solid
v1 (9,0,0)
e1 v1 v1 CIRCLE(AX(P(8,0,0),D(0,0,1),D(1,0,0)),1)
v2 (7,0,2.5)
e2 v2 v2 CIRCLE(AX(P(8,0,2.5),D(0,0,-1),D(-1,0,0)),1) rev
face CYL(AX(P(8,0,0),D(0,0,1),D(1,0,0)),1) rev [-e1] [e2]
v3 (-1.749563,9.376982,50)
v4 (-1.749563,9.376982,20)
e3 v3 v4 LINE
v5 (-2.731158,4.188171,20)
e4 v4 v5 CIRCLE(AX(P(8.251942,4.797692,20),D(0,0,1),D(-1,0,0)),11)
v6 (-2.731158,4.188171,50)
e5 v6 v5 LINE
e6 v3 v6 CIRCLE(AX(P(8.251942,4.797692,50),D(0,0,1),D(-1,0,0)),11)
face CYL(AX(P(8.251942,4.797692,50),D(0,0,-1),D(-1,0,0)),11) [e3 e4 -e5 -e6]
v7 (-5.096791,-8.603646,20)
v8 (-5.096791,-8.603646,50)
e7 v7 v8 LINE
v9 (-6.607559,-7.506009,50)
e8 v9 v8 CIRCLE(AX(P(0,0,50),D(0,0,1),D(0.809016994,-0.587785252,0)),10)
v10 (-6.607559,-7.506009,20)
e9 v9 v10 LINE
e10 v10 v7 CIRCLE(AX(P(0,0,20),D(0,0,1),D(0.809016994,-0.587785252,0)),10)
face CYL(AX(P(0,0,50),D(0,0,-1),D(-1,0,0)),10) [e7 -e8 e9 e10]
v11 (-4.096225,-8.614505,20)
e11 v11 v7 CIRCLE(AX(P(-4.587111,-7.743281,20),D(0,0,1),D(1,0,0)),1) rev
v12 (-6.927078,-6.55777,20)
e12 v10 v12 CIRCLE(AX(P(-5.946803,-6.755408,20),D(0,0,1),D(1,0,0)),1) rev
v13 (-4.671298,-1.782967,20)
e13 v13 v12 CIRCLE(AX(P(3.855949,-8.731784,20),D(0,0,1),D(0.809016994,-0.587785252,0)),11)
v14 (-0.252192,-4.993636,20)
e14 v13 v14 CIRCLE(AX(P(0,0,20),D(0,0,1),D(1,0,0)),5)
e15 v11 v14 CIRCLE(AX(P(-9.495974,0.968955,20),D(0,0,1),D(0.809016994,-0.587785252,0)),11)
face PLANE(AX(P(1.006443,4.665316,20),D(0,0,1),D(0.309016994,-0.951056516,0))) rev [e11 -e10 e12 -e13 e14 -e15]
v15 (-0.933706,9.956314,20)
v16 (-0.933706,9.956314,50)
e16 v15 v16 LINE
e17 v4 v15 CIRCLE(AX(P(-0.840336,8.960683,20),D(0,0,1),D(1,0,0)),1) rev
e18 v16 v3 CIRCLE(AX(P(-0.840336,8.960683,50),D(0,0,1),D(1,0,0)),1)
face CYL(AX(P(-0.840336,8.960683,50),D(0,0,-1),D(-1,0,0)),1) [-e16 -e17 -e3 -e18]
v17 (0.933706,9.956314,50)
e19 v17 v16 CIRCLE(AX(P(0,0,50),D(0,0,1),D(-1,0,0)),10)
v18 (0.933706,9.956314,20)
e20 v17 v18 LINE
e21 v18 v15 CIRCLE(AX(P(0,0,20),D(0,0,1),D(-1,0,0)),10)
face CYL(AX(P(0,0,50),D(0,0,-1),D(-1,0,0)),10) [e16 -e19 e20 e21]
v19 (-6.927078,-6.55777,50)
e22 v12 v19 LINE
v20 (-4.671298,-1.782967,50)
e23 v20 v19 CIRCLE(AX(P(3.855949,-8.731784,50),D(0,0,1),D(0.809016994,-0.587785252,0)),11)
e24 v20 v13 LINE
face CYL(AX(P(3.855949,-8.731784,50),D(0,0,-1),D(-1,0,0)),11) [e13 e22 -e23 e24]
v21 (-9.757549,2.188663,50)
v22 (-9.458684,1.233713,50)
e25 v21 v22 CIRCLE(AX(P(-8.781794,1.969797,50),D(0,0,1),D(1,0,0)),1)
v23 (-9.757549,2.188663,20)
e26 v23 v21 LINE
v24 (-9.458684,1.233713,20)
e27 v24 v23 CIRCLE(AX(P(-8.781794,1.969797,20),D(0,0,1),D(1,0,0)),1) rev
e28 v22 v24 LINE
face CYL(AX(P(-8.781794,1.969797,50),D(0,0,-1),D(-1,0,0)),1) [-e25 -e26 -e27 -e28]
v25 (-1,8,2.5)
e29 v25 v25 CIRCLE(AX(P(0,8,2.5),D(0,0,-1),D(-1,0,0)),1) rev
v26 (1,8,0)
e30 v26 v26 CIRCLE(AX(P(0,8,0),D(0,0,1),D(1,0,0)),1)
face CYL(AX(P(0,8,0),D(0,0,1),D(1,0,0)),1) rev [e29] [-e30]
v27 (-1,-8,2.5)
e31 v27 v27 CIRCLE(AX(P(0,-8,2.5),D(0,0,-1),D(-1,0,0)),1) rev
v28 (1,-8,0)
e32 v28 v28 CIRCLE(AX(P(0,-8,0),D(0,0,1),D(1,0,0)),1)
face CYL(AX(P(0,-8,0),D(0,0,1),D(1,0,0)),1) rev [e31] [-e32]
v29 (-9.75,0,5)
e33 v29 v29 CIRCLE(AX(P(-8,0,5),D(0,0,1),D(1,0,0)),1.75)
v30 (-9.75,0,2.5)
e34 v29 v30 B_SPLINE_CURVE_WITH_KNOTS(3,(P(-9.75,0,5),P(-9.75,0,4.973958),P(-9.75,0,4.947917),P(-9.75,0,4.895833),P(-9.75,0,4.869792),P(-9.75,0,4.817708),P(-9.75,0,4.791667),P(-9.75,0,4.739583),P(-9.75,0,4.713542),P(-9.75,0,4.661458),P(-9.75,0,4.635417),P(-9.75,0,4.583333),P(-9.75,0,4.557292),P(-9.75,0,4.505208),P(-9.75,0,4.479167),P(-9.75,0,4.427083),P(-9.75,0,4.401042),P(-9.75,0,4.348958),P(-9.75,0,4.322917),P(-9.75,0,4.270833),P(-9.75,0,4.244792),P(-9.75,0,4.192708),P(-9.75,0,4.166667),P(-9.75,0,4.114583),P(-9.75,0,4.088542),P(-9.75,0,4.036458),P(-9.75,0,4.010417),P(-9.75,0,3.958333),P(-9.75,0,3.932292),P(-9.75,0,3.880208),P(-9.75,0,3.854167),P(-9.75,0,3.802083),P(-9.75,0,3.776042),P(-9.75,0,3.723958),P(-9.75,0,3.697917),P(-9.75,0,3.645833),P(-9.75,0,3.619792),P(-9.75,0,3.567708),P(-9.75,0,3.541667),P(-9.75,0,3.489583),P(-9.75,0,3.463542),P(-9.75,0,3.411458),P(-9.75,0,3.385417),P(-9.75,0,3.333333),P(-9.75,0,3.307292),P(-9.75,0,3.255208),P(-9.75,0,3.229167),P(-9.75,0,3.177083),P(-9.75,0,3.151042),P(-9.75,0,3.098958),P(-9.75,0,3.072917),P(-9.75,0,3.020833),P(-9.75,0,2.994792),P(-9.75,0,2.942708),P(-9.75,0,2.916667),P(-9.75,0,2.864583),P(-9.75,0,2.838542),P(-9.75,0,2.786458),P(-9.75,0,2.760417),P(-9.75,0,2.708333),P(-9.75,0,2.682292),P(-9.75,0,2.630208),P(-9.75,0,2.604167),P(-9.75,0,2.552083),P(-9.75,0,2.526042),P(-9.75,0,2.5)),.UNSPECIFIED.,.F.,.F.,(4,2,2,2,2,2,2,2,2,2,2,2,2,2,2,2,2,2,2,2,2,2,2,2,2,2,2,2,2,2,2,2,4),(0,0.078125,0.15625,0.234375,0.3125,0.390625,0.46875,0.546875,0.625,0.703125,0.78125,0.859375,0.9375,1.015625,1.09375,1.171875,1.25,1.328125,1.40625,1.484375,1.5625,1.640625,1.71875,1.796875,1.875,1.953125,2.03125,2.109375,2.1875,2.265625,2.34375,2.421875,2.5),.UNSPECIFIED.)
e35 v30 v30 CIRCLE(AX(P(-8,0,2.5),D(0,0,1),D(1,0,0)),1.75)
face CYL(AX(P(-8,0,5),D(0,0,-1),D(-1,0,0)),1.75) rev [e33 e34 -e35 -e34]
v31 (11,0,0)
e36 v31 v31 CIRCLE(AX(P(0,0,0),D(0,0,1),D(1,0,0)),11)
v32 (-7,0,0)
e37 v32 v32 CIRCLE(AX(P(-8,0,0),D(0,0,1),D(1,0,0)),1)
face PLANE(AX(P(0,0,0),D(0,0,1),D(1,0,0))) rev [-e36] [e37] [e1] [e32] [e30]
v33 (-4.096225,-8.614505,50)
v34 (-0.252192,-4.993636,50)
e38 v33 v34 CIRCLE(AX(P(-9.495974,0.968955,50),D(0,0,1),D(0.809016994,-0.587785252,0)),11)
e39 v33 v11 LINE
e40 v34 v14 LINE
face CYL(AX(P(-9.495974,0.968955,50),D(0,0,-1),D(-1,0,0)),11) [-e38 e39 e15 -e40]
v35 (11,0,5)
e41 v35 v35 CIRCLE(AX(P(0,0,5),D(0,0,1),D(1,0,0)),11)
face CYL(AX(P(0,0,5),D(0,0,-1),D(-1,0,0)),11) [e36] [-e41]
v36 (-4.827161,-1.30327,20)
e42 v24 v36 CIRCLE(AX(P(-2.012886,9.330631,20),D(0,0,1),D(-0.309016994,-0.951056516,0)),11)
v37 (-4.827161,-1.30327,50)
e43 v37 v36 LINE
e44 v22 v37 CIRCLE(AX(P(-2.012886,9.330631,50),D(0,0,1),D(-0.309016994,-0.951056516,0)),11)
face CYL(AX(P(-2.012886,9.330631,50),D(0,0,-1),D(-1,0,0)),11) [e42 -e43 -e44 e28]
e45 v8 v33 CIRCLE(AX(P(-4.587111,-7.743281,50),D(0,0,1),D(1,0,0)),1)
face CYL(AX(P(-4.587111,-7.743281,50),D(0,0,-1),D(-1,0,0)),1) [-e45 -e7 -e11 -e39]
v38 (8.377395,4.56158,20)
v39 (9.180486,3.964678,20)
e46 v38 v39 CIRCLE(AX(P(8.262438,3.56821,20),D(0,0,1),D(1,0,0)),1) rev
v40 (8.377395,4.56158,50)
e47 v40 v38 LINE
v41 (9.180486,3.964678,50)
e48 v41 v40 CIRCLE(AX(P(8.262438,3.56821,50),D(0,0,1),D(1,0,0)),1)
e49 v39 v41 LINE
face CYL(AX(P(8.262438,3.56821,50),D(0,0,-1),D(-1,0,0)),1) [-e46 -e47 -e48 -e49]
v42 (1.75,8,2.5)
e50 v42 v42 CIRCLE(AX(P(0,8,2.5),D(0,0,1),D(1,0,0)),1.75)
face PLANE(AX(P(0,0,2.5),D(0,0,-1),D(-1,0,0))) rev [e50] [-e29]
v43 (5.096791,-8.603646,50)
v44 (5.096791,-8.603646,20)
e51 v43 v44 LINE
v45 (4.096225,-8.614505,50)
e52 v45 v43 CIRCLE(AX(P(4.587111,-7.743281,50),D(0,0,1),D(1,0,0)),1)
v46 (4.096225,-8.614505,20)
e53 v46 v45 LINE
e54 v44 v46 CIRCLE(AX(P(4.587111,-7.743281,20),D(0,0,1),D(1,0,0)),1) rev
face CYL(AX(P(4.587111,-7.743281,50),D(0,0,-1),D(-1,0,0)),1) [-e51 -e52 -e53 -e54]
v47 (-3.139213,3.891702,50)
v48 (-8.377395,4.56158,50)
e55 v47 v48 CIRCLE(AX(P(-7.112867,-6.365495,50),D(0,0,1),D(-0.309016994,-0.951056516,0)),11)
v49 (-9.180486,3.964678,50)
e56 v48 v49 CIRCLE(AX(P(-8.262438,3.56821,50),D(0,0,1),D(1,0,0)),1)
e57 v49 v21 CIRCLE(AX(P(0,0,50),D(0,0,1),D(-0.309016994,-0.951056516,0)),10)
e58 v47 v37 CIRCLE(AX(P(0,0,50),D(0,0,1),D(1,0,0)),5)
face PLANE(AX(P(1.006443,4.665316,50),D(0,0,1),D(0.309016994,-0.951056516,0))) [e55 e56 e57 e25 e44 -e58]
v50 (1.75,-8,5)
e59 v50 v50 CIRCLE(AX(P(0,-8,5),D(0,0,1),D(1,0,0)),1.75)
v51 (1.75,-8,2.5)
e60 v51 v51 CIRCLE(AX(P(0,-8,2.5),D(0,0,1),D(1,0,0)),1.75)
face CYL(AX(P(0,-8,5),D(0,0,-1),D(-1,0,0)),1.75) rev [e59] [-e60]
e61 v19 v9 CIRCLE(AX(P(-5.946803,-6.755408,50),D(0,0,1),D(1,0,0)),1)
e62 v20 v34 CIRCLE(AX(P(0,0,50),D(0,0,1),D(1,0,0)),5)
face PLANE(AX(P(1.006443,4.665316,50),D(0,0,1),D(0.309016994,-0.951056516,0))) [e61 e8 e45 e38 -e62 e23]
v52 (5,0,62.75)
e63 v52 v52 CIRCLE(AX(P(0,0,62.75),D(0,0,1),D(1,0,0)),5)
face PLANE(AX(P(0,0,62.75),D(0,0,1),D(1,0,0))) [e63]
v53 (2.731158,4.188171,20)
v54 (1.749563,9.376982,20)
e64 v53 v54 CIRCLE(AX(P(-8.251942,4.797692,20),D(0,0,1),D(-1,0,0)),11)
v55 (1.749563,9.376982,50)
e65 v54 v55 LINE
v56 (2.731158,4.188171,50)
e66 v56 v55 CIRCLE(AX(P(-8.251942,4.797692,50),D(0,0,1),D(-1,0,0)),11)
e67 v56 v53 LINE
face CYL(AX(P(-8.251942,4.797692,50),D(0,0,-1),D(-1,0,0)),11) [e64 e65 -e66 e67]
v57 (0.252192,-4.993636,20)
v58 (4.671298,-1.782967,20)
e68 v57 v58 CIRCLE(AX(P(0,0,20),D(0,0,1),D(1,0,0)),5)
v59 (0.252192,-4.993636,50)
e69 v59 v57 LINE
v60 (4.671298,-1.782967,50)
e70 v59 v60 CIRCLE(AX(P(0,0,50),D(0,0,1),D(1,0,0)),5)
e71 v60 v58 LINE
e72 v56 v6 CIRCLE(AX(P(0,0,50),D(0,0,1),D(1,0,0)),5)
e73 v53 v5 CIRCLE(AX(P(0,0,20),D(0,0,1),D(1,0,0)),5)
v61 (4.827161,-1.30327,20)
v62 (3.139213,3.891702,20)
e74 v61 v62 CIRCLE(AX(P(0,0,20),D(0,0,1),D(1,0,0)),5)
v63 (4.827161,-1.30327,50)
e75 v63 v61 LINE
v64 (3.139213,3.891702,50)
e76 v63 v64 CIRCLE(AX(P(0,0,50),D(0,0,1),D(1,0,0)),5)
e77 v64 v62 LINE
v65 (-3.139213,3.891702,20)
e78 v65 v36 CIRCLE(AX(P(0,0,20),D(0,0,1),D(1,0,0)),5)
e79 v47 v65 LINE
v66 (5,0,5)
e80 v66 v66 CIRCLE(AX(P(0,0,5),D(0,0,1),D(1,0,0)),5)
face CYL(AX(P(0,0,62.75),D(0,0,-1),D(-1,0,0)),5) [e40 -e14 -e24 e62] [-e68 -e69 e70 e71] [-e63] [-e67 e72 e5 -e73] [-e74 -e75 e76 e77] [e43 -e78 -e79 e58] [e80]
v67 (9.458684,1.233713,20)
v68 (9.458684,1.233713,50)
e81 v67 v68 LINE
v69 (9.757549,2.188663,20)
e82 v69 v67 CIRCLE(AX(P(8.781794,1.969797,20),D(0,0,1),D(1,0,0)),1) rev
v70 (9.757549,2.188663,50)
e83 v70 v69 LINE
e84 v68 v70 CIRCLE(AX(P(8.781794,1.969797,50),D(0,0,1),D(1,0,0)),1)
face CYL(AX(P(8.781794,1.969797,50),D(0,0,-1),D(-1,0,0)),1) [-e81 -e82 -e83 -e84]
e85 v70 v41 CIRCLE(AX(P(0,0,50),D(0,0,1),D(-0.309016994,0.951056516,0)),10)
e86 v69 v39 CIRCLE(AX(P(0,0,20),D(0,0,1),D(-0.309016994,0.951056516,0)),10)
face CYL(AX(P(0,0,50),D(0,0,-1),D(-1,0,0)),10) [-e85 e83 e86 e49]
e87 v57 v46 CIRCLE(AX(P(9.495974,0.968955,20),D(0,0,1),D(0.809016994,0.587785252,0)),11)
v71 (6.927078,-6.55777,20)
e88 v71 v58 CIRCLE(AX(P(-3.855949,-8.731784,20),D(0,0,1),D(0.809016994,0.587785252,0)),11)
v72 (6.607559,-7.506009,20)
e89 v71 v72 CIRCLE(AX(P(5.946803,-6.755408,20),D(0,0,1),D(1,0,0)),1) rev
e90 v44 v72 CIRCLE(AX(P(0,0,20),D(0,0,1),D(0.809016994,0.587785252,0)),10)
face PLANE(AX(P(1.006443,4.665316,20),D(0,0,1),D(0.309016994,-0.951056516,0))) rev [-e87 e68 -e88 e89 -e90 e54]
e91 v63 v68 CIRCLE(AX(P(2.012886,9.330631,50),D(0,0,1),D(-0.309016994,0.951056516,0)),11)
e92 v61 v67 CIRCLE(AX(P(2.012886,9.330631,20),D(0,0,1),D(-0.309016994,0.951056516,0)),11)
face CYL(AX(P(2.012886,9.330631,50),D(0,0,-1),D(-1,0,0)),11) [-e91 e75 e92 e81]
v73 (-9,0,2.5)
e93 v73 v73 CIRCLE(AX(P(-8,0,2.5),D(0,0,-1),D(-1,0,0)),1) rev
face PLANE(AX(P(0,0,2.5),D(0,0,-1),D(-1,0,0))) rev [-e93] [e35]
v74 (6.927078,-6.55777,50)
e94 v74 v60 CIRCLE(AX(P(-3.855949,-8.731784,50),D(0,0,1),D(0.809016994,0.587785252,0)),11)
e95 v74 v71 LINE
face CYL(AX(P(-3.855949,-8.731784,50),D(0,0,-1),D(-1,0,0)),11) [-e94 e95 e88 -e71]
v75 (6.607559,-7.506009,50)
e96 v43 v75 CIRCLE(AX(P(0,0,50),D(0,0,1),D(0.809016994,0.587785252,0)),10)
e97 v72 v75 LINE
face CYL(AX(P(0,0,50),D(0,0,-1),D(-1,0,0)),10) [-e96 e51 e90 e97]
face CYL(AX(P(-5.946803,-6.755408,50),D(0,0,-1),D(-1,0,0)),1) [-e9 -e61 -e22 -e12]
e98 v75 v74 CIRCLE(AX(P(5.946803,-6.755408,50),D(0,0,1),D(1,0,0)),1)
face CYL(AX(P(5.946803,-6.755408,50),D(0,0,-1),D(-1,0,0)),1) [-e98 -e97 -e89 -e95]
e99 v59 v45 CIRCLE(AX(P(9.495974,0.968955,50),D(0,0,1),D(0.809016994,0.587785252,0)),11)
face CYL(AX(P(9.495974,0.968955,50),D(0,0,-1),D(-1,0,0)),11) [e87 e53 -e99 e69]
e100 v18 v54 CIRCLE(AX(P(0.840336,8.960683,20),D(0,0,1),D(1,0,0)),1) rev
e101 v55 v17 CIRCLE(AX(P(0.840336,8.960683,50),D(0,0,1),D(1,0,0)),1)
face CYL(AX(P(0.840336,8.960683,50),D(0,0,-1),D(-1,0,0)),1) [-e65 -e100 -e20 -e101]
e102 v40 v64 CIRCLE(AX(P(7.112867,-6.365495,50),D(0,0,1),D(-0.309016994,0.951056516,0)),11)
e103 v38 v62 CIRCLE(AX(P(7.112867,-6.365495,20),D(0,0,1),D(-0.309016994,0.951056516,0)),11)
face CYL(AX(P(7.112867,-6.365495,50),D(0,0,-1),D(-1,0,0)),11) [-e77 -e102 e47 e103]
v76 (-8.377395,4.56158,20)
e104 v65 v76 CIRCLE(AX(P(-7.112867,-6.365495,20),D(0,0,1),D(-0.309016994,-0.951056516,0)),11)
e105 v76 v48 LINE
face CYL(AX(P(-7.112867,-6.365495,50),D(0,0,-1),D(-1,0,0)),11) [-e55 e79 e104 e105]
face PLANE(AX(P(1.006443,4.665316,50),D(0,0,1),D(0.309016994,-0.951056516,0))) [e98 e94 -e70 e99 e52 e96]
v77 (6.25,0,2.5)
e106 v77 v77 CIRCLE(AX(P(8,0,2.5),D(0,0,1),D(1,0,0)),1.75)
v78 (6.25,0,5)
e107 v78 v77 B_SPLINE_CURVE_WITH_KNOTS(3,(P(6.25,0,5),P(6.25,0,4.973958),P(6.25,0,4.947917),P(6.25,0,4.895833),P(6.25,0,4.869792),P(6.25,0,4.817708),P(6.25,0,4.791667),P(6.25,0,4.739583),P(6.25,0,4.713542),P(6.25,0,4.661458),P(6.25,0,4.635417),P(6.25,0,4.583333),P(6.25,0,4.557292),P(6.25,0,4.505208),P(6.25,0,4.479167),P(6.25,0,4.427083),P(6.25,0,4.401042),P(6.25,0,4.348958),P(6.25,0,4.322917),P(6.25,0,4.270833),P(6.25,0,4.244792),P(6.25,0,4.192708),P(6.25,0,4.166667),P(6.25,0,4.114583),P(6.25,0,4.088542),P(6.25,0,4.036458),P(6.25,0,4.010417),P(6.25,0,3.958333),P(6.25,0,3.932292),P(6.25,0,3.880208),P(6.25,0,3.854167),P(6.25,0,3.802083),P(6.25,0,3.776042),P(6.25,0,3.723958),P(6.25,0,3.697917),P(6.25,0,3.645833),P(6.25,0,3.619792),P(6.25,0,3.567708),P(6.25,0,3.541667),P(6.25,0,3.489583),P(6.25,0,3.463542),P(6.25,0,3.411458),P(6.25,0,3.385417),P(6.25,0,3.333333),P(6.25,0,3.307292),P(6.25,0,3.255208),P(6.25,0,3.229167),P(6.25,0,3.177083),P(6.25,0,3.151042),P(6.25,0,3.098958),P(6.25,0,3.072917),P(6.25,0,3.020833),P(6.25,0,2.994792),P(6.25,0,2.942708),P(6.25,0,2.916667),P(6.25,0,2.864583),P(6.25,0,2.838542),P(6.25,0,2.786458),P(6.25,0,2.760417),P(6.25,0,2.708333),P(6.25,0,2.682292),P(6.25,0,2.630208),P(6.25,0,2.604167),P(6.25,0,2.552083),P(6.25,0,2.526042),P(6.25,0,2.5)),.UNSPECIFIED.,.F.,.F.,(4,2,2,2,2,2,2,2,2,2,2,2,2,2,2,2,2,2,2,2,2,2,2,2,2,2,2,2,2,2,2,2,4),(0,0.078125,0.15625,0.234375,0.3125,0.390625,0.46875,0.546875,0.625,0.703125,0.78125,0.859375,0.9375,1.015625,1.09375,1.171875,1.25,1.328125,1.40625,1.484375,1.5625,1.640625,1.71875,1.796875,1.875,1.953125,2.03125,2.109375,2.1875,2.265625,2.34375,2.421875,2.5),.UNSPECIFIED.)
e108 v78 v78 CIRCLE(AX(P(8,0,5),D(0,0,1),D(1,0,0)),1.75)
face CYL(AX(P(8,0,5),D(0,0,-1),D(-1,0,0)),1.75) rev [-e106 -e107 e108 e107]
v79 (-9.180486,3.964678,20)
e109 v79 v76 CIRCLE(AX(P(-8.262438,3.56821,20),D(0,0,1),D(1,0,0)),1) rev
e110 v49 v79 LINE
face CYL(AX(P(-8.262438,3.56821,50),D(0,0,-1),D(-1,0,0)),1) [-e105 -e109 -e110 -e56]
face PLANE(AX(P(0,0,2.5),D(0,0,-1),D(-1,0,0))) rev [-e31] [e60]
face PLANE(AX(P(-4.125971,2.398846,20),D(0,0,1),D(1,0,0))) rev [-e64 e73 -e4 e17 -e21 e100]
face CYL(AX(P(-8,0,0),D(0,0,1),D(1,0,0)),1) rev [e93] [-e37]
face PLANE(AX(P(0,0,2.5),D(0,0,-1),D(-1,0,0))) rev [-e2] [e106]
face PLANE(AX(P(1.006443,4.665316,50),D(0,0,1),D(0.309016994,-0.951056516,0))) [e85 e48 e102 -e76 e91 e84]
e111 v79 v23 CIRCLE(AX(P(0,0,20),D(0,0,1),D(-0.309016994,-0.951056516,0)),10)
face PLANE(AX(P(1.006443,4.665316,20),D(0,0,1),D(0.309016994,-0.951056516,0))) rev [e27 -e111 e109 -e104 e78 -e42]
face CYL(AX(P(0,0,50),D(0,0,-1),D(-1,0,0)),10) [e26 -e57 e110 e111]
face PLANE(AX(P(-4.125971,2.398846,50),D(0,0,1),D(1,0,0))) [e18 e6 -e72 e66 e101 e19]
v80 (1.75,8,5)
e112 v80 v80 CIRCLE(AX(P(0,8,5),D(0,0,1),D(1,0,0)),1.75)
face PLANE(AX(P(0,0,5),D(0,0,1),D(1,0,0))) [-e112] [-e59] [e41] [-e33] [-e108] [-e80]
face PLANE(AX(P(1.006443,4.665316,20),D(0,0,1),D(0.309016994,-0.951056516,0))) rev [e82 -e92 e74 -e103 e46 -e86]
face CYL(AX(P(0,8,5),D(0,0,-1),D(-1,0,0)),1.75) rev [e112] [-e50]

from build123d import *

# Parameters (mm, degrees)
ESQUISSE1_R                        = 11
BOSS_EXTRU_1_DEPTH                 = 5
ENL_V_MAT_EXTRU_1_DEPTH            = 17.340134638
ESQUISSE3_R                        = 5
BOSS_EXTRU_2_DEPTH                 = 57.75
BOSS_EXTRU_3_DEPTH                 = 15
CONG_1_R                           = 1
R_P_TITION_CIRCULAIRE1_COUNT       = 5
CONG_1_OF_R_P_TITION_CIRCULAIRE1_R = 1
ESQUISSE3D1_R                      = 1.75
ENL_V_MAT_EXTRU_2_DEPTH            = 2.5
ENL_V_MAT_EXTRU_3_OUTLINE_R        = 1
ENL_V_MAT_EXTRU_3_DEPTH            = 2.5


# Read off the part's stored shape, not the designer's step: Enlèv. mat.-Extru.3
with BuildPart() as part:
    # Esquisse1 → Boss.-Extru.1 (new body)
    with BuildSketch(Plane.XY):
        Circle(ESQUISSE1_R)
    extrude(amount=BOSS_EXTRU_1_DEPTH)

    # Esquisse2 → Enlèv. mat.-Extru.1 (cut, through all)
    with BuildSketch(Plane.XY.offset(5)):
        with BuildLine():
            ThreePointArc((1, 8), (0.707106781, 8.707106781), (0, 9))
            Line((0, 9), (0, 8))
            ThreePointArc((0, 8), (0.5, 7.984359711), (0.998044964, 7.9375))
            ThreePointArc((0.998044964, 7.9375), (0.999511121, 7.968734715), (1, 8))
        make_face()
        with BuildLine():
            Line((0, 8), (0, 9))
            ThreePointArc((0, 9), (-0.728868987, 8.684653197), (-0.998044964, 7.9375))
            ThreePointArc((-0.998044964, 7.9375), (-0.5, 7.984359711), (0, 8))
        make_face()
        with BuildLine():
            ThreePointArc((0.998044964, 7.9375), (0.5, 7.984359711), (0, 8))
            Line((0, 8), (0, 7))
            ThreePointArc((0, 7), (0.684653197, 7.271131013), (0.998044964, 7.9375))
        make_face()
        with BuildLine():
            Line((0, 7), (0, 8))
            ThreePointArc((0, 8), (-0.5, 7.984359711), (-0.998044964, 7.9375))
            ThreePointArc((-0.998044964, 7.9375), (-0.684653197, 7.271131013), (0, 7))
        make_face()
        with BuildLine():
            ThreePointArc((0, -7), (-0.684653197, -7.271131013), (-0.998044964, -7.9375))
            ThreePointArc((-0.998044964, -7.9375), (-0.5, -7.984359711), (0, -8))
            Line((0, -8), (0, -7))
        make_face()
        with BuildLine():
            ThreePointArc((0, -8), (-0.5, -7.984359711), (-0.998044964, -7.9375))
            ThreePointArc((-0.998044964, -7.9375), (-0.728868987, -8.684653197), (0, -9))
            Line((0, -9), (0, -8))
        make_face()
        with BuildLine():
            ThreePointArc((0.998044964, -7.9375), (0.684653197, -7.271131013), (0, -7))
            Line((0, -7), (0, -8))
            ThreePointArc((0, -8), (0.5, -7.984359711), (0.998044964, -7.9375))
        make_face()
        with BuildLine():
            ThreePointArc((0.998044964, -7.9375), (0.5, -7.984359711), (0, -8))
            Line((0, -8), (0, -9))
            ThreePointArc((0, -9), (0.707106781, -8.707106781), (1, -8))
            ThreePointArc((1, -8), (0.999511121, -7.968734715), (0.998044964, -7.9375))
        make_face()
    extrude(amount=-ENL_V_MAT_EXTRU_1_DEPTH, mode=Mode.SUBTRACT)

    # Esquisse3 → Boss.-Extru.2 (add)
    with BuildSketch(Plane.XY.offset(5)):
        Circle(ESQUISSE3_R)
    extrude(amount=BOSS_EXTRU_2_DEPTH)

    # Esquisse4 → Boss.-Extru.3 (add, symmetric)
    with BuildSketch(Plane.XY.offset(35)):
        with BuildLine():
            ThreePointArc((-2.731158071, 4.188170912), (-2.5, 7.120566641), (-1.5, 9.886859967))
            ThreePointArc((-1.5, 9.886859967), (0, 10), (1.5, 9.886859967))
            ThreePointArc((1.5, 9.886859967), (2.5, 7.120566641), (2.731158071, 4.188170912))
            ThreePointArc((2.731158071, 4.188170912), (0, -5), (-2.731158071, 4.188170912))
        make_face()
    boss_extru_3 = extrude(amount=BOSS_EXTRU_3_DEPTH, both=True)

    # Congé1
    cong_1_edges = [part.edges().sort_by_distance(p)[0] for p in [
        (1.5, 9.886859967, 35),
        (-1.5, 9.886859967, 35),
    ]]
    fillet(cong_1_edges, radius=CONG_1_R)

    # Répétition circulaire1: Boss.-Extru.3 ×5 about axis
    r_p_tition_circulaire1_axis = Axis((0, 0, 0), (0, 0, 1))
    for i in range(1, R_P_TITION_CIRCULAIRE1_COUNT):
        add(boss_extru_3.rotate(r_p_tition_circulaire1_axis, i * 360 / R_P_TITION_CIRCULAIRE1_COUNT))

    # Congé1 of Répétition circulaire1
    cong_1_of_r_p_tition_circulaire1_edges = [part.edges().sort_by_distance(p)[0] for p in [
        (-8.939437105, 4.481792525, 35),
        (-9.866488089, 1.628622976, 35),
        (-7.024875971, -7.116959856, 35),
        (-4.597824988, -8.880315612, 35),
        (4.597824988, -8.880315612, 35),
        (7.024875971, -7.116959856, 35),
        (9.866488089, 1.628622976, 35),
        (8.939437105, 4.481792525, 35),
    ]]
    fillet(cong_1_of_r_p_tition_circulaire1_edges, radius=CONG_1_OF_R_P_TITION_CIRCULAIRE1_R)

    # Esquisse3D1 → Enlèv. mat.-Extru.2 (cut)
    with BuildSketch(Plane(origin=(0, -8, 5), x_dir=(0, 1, 0), z_dir=(-7.673874556635152e-12, 0, -1.0))):
        with Locations(Location((0, 0, 0), (0, 0, 90))):
            Circle(ESQUISSE3D1_R)
        with Locations(Location((8, 8, 0), (0, 0, 270))):
            Circle(ESQUISSE3D1_R)
        with Locations(Location((8, -8, 0), (0, 0, 270))):
            Circle(ESQUISSE3D1_R)
        with Locations(Location((16, 0, 0), (0, 0, 90))):
            Circle(ESQUISSE3D1_R)
    extrude(amount=ENL_V_MAT_EXTRU_2_DEPTH, mode=Mode.SUBTRACT)

    # Enlèv. mat.-Extru.3 outline → Enlèv. mat.-Extru.3 (cut)
    with BuildSketch(Plane.XY):
        with Locations((8, 0)):
            Circle(ENL_V_MAT_EXTRU_3_OUTLINE_R)
        with Locations((-8, 0)):
            Circle(ENL_V_MAT_EXTRU_3_OUTLINE_R)
    extrude(amount=ENL_V_MAT_EXTRU_3_DEPTH, mode=Mode.SUBTRACT)


solid = part.part
